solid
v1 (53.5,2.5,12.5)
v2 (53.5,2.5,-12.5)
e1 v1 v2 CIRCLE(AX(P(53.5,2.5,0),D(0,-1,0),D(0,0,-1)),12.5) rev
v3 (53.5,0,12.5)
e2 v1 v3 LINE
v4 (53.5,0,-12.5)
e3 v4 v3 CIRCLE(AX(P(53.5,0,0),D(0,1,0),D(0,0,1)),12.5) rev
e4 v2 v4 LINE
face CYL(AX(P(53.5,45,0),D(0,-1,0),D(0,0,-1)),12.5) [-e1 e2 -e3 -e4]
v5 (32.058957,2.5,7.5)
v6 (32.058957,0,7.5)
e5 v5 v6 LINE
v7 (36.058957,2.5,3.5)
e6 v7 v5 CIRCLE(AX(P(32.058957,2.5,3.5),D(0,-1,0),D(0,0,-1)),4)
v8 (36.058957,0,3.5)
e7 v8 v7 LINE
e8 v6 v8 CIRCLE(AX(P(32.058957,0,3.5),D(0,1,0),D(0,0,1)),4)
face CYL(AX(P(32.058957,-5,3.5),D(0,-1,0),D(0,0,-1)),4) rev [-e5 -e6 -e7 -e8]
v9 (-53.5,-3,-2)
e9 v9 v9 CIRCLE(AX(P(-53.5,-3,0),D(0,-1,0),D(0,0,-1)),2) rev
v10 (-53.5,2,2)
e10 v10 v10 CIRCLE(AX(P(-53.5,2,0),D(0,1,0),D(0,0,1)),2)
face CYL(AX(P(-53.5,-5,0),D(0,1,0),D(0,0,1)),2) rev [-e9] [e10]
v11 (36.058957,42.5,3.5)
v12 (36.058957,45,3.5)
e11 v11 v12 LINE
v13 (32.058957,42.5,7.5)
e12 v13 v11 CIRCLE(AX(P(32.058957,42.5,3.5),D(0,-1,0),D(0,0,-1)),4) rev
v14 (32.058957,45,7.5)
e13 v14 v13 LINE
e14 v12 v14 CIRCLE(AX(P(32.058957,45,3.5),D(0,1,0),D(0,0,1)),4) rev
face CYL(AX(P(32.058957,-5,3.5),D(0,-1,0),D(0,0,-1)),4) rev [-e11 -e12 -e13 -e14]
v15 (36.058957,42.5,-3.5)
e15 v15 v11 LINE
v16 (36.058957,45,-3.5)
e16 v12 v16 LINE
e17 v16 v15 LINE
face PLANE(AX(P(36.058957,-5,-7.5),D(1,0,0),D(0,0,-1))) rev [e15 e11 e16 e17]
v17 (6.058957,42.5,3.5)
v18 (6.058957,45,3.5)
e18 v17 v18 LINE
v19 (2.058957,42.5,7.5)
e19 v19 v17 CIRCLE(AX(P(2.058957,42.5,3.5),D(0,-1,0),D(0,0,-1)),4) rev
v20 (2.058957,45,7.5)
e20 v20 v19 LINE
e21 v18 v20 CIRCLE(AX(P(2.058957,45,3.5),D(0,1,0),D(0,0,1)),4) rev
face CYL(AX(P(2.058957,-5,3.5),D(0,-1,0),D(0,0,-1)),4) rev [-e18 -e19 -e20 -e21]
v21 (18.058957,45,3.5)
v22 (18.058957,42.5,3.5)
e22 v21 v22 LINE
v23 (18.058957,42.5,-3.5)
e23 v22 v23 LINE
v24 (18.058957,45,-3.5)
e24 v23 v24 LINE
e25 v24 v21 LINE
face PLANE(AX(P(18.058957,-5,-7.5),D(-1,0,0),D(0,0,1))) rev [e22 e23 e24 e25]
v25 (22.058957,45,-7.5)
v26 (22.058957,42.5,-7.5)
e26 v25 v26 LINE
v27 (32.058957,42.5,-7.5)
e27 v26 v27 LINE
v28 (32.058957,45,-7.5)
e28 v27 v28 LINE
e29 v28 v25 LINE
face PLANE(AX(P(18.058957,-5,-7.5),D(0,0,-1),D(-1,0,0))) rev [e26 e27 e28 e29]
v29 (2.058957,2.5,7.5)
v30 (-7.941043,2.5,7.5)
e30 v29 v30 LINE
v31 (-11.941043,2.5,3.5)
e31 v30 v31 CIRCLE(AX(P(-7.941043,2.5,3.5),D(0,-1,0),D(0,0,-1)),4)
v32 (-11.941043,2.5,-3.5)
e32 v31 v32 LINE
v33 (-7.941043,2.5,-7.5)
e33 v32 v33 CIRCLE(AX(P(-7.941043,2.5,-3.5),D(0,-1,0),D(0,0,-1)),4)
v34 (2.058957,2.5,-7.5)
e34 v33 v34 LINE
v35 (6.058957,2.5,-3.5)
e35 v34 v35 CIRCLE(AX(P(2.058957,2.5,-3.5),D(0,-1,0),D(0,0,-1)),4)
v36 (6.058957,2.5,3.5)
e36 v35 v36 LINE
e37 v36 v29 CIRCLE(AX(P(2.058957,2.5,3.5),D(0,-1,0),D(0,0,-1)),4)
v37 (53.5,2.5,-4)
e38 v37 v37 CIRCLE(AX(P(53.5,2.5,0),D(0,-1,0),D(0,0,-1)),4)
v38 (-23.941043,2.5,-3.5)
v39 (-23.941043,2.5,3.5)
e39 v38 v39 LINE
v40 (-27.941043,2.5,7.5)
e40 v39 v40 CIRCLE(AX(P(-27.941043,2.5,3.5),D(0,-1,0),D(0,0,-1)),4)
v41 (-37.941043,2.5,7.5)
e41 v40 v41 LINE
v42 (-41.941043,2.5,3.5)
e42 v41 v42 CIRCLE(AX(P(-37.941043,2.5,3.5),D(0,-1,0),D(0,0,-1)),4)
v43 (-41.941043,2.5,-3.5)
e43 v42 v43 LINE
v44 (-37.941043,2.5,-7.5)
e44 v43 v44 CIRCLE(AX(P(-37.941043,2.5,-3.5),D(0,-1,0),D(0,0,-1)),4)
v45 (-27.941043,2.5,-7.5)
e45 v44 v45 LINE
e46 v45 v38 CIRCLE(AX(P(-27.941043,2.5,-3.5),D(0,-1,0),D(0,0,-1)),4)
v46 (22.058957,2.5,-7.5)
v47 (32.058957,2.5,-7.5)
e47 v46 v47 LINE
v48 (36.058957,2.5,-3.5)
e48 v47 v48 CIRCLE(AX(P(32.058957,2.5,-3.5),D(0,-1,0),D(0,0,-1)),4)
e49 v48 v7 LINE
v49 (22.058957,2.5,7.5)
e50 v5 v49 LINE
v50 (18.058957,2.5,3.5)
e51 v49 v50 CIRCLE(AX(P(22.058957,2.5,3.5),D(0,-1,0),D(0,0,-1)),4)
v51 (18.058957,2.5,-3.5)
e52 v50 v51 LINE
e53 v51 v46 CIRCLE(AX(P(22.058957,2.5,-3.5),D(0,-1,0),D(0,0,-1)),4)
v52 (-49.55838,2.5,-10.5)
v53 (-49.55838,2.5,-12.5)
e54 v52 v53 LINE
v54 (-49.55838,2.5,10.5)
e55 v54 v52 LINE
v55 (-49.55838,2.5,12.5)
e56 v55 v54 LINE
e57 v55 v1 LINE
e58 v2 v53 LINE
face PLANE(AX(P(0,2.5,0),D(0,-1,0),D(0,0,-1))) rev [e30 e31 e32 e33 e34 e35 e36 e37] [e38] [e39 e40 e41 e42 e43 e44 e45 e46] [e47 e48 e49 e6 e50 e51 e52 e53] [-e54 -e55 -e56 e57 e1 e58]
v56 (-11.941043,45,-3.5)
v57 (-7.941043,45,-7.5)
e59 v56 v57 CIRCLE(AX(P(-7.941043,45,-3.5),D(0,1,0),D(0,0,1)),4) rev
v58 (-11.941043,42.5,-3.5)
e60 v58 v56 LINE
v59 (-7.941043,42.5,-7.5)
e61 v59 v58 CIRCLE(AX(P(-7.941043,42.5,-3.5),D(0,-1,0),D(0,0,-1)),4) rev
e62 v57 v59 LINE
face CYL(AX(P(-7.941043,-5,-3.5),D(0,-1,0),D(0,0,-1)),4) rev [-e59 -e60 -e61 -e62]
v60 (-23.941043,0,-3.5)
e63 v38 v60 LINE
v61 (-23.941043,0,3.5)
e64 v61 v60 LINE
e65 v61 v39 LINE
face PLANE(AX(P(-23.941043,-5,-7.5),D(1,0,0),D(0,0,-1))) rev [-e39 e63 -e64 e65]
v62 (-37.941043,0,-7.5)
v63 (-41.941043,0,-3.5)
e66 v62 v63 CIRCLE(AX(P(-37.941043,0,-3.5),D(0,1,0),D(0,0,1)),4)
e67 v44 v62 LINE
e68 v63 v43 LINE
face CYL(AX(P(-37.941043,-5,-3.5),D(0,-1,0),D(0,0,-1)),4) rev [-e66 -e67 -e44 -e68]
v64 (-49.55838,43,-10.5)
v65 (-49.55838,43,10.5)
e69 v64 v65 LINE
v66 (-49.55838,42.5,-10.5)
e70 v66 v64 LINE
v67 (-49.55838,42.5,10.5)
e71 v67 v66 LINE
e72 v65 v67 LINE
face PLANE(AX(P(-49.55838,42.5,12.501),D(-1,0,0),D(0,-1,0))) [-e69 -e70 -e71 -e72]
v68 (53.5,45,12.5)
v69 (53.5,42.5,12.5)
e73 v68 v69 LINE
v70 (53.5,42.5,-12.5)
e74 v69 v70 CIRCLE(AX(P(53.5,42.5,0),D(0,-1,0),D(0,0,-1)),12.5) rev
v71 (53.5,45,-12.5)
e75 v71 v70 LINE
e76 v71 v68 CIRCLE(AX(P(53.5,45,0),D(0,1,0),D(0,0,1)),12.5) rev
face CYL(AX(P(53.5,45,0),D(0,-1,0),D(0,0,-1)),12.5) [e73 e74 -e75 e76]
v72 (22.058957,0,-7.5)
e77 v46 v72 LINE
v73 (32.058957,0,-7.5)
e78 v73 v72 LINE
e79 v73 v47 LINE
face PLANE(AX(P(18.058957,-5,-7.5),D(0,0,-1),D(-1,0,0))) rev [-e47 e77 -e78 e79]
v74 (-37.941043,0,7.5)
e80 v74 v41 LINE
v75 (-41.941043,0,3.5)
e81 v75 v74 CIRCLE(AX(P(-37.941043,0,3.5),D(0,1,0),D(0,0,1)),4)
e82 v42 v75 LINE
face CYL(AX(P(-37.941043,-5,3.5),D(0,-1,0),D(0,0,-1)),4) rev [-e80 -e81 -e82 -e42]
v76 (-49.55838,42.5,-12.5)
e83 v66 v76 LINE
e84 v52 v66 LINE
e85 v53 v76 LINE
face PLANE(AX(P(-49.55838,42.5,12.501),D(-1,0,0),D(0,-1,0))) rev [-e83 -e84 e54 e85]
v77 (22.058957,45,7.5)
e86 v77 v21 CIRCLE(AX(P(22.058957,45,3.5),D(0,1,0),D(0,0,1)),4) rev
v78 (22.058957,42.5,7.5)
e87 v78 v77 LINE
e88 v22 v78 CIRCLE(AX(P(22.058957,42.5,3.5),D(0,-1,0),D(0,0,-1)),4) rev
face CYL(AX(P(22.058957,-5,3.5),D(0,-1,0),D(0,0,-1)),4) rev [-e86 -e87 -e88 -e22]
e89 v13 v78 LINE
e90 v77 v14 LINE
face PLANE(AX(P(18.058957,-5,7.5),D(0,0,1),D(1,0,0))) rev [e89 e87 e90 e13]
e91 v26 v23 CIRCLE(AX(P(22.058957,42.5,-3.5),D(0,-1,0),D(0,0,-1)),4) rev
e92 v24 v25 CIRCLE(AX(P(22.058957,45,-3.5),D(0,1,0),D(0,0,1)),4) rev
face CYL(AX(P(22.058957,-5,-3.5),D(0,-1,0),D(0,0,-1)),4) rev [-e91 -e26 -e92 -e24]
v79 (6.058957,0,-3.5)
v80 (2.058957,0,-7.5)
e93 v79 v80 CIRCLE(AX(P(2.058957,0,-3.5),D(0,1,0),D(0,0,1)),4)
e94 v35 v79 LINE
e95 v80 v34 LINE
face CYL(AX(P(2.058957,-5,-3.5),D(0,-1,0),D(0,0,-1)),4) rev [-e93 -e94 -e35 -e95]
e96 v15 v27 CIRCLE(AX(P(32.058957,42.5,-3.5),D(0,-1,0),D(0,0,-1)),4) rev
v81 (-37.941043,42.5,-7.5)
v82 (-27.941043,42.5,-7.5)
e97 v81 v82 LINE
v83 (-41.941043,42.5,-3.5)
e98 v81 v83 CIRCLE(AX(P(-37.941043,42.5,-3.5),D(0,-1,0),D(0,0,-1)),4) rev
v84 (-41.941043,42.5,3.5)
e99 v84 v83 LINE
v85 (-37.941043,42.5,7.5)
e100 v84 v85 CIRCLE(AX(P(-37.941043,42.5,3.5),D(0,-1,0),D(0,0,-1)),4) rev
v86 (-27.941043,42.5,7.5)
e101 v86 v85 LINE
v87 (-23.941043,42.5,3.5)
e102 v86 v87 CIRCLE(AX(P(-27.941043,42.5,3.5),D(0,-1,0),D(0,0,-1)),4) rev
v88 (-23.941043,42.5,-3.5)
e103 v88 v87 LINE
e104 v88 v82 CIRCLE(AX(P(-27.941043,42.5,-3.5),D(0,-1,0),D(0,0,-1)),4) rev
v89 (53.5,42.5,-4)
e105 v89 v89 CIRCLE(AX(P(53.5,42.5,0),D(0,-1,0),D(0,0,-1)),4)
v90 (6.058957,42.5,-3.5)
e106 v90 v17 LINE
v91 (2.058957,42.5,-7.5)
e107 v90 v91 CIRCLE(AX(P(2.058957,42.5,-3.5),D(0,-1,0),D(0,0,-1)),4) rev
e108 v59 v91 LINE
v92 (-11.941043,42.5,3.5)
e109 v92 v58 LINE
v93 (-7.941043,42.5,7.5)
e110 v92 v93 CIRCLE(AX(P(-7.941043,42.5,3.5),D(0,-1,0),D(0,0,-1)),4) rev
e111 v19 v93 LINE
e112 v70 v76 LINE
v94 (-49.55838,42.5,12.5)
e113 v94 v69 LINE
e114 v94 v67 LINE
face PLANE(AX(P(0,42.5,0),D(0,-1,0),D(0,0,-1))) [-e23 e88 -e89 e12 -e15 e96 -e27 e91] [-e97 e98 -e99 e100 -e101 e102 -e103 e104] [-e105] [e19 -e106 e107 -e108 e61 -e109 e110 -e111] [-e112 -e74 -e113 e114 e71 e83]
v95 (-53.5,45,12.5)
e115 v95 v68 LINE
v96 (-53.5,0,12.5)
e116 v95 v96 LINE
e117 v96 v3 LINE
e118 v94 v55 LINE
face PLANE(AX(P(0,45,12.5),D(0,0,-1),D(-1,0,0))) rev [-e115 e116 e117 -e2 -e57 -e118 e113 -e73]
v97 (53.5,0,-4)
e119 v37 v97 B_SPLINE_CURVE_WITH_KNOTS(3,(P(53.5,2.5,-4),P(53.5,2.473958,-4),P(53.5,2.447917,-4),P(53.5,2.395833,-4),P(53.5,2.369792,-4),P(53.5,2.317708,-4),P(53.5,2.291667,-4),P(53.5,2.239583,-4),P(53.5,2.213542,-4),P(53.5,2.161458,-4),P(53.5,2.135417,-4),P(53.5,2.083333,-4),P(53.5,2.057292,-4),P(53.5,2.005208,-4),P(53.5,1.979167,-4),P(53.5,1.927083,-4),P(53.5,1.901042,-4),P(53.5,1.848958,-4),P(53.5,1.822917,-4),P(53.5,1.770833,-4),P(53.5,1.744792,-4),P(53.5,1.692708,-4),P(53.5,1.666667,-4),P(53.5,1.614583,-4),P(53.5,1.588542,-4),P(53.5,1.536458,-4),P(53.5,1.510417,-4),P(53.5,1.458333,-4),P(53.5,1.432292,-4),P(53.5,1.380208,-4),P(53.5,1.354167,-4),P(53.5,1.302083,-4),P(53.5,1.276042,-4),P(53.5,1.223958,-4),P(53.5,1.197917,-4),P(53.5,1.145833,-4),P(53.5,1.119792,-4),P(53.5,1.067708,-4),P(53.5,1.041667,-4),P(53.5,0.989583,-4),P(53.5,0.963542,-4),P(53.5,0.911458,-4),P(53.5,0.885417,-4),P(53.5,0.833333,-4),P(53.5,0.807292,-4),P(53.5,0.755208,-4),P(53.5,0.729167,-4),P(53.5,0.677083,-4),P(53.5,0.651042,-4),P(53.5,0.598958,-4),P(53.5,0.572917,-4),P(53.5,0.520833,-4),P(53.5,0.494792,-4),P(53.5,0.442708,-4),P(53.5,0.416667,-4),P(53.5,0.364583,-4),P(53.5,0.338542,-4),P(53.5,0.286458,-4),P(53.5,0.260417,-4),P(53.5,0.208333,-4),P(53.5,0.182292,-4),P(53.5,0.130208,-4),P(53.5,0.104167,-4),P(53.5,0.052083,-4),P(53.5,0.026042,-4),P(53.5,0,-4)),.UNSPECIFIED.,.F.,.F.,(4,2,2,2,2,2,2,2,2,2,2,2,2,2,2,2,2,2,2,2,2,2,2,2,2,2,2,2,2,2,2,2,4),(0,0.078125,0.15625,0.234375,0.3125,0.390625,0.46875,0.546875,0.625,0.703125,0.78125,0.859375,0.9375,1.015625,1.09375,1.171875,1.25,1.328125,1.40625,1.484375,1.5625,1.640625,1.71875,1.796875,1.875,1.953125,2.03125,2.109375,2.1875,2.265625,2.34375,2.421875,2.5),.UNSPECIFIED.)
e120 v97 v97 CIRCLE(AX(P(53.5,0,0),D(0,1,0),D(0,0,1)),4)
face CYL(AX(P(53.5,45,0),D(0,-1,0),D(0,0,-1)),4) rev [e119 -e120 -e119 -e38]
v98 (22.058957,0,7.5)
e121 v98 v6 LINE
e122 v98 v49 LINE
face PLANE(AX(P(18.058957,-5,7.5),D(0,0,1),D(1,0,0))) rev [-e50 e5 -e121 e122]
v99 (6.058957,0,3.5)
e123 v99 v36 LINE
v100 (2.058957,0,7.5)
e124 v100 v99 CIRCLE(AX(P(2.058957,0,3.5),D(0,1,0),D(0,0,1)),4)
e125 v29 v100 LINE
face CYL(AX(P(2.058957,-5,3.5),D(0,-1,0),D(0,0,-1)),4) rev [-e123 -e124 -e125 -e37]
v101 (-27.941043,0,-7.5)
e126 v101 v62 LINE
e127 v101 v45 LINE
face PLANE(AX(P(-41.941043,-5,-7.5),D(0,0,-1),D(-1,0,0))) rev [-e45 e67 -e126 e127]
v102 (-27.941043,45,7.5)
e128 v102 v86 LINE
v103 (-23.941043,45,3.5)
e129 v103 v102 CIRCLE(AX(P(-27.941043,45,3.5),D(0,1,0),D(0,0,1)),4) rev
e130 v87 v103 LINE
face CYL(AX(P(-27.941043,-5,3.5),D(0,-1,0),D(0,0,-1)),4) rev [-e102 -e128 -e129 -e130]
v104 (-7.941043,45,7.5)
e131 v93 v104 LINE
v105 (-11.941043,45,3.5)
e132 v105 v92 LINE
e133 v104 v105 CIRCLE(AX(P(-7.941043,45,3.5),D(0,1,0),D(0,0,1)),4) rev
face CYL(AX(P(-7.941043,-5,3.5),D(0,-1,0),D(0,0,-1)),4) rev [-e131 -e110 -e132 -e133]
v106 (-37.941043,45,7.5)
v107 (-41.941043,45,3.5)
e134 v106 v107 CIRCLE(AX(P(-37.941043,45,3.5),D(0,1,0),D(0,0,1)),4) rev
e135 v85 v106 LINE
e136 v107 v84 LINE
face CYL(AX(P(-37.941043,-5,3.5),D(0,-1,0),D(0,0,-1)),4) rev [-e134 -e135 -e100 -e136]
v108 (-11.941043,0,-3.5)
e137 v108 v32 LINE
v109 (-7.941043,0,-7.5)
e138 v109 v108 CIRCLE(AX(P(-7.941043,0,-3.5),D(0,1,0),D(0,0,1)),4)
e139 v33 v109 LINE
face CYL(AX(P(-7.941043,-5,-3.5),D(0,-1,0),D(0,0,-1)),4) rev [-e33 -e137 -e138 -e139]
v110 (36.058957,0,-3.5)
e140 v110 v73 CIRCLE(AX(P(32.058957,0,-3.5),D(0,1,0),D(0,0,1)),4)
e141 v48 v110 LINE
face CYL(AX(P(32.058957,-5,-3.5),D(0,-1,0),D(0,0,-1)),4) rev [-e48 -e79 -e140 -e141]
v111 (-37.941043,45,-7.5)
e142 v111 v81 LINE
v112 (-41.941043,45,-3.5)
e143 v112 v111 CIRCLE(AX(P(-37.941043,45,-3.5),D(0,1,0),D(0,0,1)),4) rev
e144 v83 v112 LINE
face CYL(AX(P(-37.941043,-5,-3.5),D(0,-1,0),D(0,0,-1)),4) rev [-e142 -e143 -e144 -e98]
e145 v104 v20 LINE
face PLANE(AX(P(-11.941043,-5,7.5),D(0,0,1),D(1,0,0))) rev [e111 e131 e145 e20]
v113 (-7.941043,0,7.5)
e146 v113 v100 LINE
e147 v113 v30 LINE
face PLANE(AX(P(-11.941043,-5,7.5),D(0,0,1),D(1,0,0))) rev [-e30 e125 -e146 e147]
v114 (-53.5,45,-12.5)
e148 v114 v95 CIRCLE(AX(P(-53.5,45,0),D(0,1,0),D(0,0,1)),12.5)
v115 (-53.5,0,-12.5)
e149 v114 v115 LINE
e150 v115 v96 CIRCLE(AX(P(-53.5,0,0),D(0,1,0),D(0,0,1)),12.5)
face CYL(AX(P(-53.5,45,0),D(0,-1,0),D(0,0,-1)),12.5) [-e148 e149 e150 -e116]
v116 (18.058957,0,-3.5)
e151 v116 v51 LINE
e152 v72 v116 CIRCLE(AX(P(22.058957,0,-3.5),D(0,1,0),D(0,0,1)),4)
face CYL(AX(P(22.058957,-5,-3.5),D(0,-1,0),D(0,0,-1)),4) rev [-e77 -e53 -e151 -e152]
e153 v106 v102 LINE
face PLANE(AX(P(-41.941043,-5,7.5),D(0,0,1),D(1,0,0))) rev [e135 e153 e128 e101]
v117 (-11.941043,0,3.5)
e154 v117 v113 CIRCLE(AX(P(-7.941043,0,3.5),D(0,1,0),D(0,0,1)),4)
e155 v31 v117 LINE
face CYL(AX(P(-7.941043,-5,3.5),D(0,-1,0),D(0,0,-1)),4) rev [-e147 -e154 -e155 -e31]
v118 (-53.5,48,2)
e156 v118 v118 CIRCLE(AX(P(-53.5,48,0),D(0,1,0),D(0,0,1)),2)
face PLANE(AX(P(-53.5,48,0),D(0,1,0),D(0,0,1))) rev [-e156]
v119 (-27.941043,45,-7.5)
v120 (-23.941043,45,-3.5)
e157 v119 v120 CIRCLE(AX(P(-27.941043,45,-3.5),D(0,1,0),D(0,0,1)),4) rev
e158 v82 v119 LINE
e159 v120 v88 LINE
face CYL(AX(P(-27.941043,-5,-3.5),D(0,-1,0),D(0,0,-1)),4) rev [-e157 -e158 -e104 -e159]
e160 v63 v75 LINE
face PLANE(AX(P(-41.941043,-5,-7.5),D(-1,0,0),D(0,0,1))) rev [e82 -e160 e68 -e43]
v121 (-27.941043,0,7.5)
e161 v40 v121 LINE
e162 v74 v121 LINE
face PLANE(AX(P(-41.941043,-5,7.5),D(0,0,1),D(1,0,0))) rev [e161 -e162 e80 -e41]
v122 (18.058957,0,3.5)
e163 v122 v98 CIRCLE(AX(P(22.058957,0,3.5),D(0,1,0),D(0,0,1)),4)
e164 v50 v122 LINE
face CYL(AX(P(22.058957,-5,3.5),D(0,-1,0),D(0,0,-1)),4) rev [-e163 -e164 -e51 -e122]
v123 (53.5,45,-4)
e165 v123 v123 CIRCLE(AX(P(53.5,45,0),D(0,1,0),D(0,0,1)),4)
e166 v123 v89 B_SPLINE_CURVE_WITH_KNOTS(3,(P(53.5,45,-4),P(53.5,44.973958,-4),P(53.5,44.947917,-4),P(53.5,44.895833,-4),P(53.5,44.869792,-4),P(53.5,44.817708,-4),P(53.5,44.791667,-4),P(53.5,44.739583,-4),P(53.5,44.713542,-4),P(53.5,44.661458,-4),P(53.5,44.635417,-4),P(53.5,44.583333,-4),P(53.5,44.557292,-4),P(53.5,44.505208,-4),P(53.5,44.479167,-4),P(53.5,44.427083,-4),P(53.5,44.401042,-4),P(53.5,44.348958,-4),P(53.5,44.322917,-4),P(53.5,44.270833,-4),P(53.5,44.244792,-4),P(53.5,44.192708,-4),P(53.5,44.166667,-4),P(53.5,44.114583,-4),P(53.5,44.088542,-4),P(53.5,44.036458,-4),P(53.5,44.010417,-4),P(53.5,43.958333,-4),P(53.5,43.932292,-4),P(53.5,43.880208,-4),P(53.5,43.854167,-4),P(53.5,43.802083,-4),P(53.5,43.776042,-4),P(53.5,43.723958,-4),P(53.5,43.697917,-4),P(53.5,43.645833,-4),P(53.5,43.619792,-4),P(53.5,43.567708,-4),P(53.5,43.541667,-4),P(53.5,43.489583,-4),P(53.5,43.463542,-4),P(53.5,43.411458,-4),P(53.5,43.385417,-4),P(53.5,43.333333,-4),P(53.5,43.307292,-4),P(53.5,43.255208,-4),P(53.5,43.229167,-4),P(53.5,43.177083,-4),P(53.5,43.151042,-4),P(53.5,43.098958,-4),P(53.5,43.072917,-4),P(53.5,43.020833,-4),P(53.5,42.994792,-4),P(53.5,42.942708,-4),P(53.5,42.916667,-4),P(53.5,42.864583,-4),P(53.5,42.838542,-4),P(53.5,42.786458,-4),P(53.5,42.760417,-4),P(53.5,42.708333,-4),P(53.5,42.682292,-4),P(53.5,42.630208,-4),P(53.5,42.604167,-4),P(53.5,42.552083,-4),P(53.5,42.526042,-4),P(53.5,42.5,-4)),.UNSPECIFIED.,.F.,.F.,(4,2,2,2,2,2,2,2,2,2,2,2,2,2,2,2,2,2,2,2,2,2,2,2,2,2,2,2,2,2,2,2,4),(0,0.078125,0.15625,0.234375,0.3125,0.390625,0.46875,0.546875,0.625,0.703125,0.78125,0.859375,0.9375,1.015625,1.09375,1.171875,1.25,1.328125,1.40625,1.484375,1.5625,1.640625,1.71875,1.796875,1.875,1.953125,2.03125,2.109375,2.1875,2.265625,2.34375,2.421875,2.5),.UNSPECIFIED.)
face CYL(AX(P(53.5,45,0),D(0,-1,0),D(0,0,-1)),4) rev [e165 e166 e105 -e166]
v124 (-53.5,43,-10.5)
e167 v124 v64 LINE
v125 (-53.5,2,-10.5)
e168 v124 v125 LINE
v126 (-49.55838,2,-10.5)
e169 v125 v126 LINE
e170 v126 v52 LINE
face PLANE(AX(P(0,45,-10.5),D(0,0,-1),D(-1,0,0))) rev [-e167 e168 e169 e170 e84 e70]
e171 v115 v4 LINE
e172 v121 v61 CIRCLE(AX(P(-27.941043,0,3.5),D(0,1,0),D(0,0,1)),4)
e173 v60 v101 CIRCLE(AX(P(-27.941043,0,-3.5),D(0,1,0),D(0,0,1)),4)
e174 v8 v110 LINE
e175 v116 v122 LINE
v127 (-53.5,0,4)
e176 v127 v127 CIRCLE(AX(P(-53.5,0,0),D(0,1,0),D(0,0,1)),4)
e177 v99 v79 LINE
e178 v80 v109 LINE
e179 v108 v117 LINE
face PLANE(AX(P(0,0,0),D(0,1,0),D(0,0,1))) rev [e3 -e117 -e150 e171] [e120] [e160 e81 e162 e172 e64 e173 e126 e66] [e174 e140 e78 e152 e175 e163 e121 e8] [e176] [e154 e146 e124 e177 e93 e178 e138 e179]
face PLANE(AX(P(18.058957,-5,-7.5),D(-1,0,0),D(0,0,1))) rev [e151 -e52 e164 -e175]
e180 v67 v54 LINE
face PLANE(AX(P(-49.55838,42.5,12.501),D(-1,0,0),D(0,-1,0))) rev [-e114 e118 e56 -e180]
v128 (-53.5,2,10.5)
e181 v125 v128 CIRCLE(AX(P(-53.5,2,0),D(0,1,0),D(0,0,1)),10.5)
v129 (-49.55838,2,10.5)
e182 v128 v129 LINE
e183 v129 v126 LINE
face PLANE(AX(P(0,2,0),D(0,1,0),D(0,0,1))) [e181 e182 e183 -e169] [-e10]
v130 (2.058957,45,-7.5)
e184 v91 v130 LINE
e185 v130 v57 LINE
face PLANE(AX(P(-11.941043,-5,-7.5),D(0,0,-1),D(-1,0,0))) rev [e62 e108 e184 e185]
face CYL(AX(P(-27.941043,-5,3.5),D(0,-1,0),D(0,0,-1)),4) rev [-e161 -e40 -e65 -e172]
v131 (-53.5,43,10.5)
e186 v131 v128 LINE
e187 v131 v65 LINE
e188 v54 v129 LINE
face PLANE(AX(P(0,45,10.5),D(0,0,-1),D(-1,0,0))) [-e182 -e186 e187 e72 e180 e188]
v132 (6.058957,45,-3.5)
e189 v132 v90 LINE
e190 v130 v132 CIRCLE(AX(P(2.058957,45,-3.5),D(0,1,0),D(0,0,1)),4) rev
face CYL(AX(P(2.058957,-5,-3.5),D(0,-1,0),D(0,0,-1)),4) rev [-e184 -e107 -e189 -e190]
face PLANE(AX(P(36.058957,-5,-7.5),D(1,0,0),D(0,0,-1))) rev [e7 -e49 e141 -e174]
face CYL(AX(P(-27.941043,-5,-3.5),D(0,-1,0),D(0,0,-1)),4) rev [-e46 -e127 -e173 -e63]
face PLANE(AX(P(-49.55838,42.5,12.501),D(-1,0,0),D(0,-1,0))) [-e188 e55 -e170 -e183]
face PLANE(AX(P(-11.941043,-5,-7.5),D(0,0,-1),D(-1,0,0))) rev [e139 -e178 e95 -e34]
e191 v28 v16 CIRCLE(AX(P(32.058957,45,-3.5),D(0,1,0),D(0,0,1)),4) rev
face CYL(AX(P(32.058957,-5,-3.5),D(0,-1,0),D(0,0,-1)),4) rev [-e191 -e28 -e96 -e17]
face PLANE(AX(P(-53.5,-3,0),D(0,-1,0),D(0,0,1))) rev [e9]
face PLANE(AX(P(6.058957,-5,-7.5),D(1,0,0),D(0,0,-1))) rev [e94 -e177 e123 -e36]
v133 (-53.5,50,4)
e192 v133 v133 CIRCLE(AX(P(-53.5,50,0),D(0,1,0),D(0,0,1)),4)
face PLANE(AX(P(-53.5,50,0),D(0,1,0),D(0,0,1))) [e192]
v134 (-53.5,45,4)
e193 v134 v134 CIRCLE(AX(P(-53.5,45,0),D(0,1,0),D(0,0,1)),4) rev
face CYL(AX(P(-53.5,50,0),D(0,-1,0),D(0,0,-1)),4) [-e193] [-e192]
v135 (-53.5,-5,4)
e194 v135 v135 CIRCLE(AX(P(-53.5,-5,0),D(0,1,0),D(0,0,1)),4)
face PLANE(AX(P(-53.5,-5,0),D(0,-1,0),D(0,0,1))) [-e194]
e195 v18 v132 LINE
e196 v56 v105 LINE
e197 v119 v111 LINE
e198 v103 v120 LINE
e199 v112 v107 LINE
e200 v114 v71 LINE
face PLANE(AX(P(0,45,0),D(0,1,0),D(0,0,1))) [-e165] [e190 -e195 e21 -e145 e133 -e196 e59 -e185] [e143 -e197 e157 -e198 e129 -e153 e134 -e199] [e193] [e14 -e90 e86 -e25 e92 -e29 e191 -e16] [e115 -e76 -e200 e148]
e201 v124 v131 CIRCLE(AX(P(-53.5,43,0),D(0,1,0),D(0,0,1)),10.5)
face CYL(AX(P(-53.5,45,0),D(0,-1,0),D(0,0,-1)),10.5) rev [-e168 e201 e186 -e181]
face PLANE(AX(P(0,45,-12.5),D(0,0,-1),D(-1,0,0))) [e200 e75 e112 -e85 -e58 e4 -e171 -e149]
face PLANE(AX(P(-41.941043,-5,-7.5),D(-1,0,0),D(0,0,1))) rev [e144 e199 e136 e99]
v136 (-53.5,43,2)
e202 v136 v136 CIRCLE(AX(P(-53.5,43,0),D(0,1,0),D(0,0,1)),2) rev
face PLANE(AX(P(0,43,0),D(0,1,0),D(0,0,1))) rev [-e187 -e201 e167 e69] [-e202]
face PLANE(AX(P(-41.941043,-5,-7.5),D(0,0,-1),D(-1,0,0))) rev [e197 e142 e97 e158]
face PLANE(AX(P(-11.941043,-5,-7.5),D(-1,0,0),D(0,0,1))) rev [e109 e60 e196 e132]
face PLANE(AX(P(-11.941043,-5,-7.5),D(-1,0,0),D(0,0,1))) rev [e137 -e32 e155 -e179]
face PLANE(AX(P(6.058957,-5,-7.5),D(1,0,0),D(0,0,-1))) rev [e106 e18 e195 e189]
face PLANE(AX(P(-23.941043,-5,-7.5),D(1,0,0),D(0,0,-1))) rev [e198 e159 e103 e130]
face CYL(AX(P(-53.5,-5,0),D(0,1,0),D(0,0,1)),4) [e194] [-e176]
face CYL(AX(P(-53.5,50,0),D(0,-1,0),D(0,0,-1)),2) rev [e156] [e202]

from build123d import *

# Parameters (mm, degrees)
SKETCH1_R              = 4
BOSS_EXTRUDE1_DEPTH    = 45
SKETCH2_W              = 50.339144224
SKETCH2_H              = 25
CUT_EXTRUDE1_DEPTH     = 20
SKETCH3_R              = 4
BOSS_EXTRUDE2_DEPTH    = 5
CUT_EXTRUDE2_REACH     = 88.493
SKETCH4_W              = 77.888808367
SKETCH4_H              = 40
SKETCH5_W              = 18
SKETCH5_H              = 15
CUT_EXTRUDE3_DEPTH     = 84.739178405
FILLET1_R              = 4
LPATTERN1_COUNT        = 3
LPATTERN1_PITCH        = 30
FILLET1_OF_LPATTERN1_R = 4
SHELL1_START           = 2
SHELL1_DEPTH           = 41
SHELL1_START_2         = -3
SHELL1_2_OUTLINE_R     = 2
SHELL1_2_DEPTH         = 51


# Read off the part's stored shape, not the designer's step: Shell1
with BuildPart() as part:
    # Sketch1 → Boss-Extrude1 (new body)
    with BuildSketch(Plane(origin=(0, 0, 0), x_dir=(1, 0, 0), z_dir=(0, 1, 0))):
        with BuildLine():
            Line((-53.5, -12.5), (53.5, -12.5))
            ThreePointArc((53.5, -12.5), (66, 0), (53.5, 12.5))
            Line((53.5, 12.5), (-53.5, 12.5))
            ThreePointArc((-53.5, 12.5), (-66, 0), (-53.5, -12.5))
        make_face()
        with Locations(Location((53.5, 0, 0), (0, 0, 90))):
            Circle(SKETCH1_R, mode=Mode.SUBTRACT)
    extrude(amount=BOSS_EXTRUDE1_DEPTH)

    # Sketch2 → Cut-Extrude1 (cut, symmetric)
    with BuildSketch(Plane(origin=(0, 22.5, 0), x_dir=(1, 0, 0), z_dir=(0, 1, 0))):
        with Locations((53.5, 0)):
            Rectangle(SKETCH2_W, SKETCH2_H)
    extrude(amount=CUT_EXTRUDE1_DEPTH, both=True, mode=Mode.SUBTRACT)

    # Sketch3 → Boss-Extrude2 (add, symmetric)
    with BuildSketch(Plane(origin=(0, 45, 0), x_dir=(1, 0, 0), z_dir=(0, 1, 0))):
        with Locations(Location((-53.5, 0, 0), (0, 0, 270))):
            Circle(SKETCH3_R)
    boss_extrude2 = extrude(amount=BOSS_EXTRUDE2_DEPTH, both=True)

    # Mirror1: Boss-Extrude2 across plane
    add(boss_extrude2.mirror(Plane.ZX.offset(22.5)))

    # Sketch4 → Cut-Extrude2 (cut, up to next)
    with BuildSketch(Plane(origin=(0, 0, -12.5), x_dir=(-1, 0, 0), z_dir=(0, 0, -1)), mode=Mode.PRIVATE) as cut_extrude2_sk1:
        with Locations((10.613976295, 22.5)):
            Rectangle(SKETCH4_W, SKETCH4_H)
    cut_extrude2_tool1 = extrude(cut_extrude2_sk1.sketch, amount=-CUT_EXTRUDE2_REACH, mode=Mode.PRIVATE) & part.part
    add(cut_extrude2_tool1.solids().sort_by_distance((-10.613976, 22.5, -12.5))[0], mode=Mode.SUBTRACT)

    # Sketch5 → Cut-Extrude3 (cut, through all)
    with BuildSketch(Plane(origin=(0, 45, 0), x_dir=(1, 0, 0), z_dir=(0, 1, 0))):
        with Locations((-32.941043084, 0)):
            Rectangle(SKETCH5_W, SKETCH5_H)
    cut_extrude3 = extrude(amount=-CUT_EXTRUDE3_DEPTH, mode=Mode.SUBTRACT)

    # Fillet1
    fillet1_edges = [part.edges().sort_by_distance(p)[0] for p in [
        (-41.941043084, 1.25, 7.5),
        (-41.941043084, 1.25, -7.5),
        (-23.941043084, 1.25, -7.5),
        (-23.941043084, 1.25, 7.5),
        (-41.941043084, 43.75, 7.5),
        (-41.941043084, 43.75, -7.5),
        (-23.941043084, 43.75, -7.5),
        (-23.941043084, 43.75, 7.5),
    ]]
    fillet(fillet1_edges, radius=FILLET1_R)

    # LPattern1: Cut-Extrude3 ×3
    with Locations(*[(i * LPATTERN1_PITCH, 0, 0) for i in range(1, LPATTERN1_COUNT)]):
        add(cut_extrude3, mode=Mode.SUBTRACT)

    # Fillet1 of LPattern1
    fillet1_of_lpattern1_edges = [part.edges().sort_by_distance(p)[0] for p in [
        (-11.941043084, 1.25, 7.5),
        (-11.941043084, 1.25, -7.5),
        (6.058956916, 1.25, -7.5),
        (6.058956916, 1.25, 7.5),
        (-11.941043084, 43.75, 7.5),
        (-11.941043084, 43.75, -7.5),
        (6.058956916, 43.75, -7.5),
        (6.058956916, 43.75, 7.5),
        (18.058956916, 1.25, 7.5),
        (18.058956916, 1.25, -7.5),
        (36.058956916, 1.25, -7.5),
        (36.058956916, 1.25, 7.5),
        (18.058956916, 43.75, 7.5),
        (18.058956916, 43.75, -7.5),
        (36.058956916, 43.75, -7.5),
        (36.058956916, 43.75, 7.5),
    ]]
    fillet(fillet1_of_lpattern1_edges, radius=FILLET1_OF_LPATTERN1_R)

    # Shell1 outline → Shell1 (cut)
    with BuildSketch(Plane(origin=(0, 0, 0), x_dir=(1, 0, 0), z_dir=(0, 1, 0)).offset(SHELL1_START)):
        with BuildLine():
            Line((-49.558380479, -10.5), (-49.558380479, 10.5))
            Line((-49.558380479, 10.5), (-53.5, 10.5))
            ThreePointArc((-53.5, 10.5), (-64, 0), (-53.5, -10.5))
            Line((-53.5, -10.5), (-49.558380479, -10.5))
        make_face()
    extrude(amount=SHELL1_DEPTH, mode=Mode.SUBTRACT)

    # Shell1 2 outline → Shell1 2 (cut)
    with BuildSketch(Plane(origin=(0, 0, 0), x_dir=(1, 0, 0), z_dir=(0, 1, 0)).offset(SHELL1_START_2)):
        with Locations((-53.5, 0)):
            Circle(SHELL1_2_OUTLINE_R)
    extrude(amount=SHELL1_2_DEPTH, mode=Mode.SUBTRACT)


solid = part.part
